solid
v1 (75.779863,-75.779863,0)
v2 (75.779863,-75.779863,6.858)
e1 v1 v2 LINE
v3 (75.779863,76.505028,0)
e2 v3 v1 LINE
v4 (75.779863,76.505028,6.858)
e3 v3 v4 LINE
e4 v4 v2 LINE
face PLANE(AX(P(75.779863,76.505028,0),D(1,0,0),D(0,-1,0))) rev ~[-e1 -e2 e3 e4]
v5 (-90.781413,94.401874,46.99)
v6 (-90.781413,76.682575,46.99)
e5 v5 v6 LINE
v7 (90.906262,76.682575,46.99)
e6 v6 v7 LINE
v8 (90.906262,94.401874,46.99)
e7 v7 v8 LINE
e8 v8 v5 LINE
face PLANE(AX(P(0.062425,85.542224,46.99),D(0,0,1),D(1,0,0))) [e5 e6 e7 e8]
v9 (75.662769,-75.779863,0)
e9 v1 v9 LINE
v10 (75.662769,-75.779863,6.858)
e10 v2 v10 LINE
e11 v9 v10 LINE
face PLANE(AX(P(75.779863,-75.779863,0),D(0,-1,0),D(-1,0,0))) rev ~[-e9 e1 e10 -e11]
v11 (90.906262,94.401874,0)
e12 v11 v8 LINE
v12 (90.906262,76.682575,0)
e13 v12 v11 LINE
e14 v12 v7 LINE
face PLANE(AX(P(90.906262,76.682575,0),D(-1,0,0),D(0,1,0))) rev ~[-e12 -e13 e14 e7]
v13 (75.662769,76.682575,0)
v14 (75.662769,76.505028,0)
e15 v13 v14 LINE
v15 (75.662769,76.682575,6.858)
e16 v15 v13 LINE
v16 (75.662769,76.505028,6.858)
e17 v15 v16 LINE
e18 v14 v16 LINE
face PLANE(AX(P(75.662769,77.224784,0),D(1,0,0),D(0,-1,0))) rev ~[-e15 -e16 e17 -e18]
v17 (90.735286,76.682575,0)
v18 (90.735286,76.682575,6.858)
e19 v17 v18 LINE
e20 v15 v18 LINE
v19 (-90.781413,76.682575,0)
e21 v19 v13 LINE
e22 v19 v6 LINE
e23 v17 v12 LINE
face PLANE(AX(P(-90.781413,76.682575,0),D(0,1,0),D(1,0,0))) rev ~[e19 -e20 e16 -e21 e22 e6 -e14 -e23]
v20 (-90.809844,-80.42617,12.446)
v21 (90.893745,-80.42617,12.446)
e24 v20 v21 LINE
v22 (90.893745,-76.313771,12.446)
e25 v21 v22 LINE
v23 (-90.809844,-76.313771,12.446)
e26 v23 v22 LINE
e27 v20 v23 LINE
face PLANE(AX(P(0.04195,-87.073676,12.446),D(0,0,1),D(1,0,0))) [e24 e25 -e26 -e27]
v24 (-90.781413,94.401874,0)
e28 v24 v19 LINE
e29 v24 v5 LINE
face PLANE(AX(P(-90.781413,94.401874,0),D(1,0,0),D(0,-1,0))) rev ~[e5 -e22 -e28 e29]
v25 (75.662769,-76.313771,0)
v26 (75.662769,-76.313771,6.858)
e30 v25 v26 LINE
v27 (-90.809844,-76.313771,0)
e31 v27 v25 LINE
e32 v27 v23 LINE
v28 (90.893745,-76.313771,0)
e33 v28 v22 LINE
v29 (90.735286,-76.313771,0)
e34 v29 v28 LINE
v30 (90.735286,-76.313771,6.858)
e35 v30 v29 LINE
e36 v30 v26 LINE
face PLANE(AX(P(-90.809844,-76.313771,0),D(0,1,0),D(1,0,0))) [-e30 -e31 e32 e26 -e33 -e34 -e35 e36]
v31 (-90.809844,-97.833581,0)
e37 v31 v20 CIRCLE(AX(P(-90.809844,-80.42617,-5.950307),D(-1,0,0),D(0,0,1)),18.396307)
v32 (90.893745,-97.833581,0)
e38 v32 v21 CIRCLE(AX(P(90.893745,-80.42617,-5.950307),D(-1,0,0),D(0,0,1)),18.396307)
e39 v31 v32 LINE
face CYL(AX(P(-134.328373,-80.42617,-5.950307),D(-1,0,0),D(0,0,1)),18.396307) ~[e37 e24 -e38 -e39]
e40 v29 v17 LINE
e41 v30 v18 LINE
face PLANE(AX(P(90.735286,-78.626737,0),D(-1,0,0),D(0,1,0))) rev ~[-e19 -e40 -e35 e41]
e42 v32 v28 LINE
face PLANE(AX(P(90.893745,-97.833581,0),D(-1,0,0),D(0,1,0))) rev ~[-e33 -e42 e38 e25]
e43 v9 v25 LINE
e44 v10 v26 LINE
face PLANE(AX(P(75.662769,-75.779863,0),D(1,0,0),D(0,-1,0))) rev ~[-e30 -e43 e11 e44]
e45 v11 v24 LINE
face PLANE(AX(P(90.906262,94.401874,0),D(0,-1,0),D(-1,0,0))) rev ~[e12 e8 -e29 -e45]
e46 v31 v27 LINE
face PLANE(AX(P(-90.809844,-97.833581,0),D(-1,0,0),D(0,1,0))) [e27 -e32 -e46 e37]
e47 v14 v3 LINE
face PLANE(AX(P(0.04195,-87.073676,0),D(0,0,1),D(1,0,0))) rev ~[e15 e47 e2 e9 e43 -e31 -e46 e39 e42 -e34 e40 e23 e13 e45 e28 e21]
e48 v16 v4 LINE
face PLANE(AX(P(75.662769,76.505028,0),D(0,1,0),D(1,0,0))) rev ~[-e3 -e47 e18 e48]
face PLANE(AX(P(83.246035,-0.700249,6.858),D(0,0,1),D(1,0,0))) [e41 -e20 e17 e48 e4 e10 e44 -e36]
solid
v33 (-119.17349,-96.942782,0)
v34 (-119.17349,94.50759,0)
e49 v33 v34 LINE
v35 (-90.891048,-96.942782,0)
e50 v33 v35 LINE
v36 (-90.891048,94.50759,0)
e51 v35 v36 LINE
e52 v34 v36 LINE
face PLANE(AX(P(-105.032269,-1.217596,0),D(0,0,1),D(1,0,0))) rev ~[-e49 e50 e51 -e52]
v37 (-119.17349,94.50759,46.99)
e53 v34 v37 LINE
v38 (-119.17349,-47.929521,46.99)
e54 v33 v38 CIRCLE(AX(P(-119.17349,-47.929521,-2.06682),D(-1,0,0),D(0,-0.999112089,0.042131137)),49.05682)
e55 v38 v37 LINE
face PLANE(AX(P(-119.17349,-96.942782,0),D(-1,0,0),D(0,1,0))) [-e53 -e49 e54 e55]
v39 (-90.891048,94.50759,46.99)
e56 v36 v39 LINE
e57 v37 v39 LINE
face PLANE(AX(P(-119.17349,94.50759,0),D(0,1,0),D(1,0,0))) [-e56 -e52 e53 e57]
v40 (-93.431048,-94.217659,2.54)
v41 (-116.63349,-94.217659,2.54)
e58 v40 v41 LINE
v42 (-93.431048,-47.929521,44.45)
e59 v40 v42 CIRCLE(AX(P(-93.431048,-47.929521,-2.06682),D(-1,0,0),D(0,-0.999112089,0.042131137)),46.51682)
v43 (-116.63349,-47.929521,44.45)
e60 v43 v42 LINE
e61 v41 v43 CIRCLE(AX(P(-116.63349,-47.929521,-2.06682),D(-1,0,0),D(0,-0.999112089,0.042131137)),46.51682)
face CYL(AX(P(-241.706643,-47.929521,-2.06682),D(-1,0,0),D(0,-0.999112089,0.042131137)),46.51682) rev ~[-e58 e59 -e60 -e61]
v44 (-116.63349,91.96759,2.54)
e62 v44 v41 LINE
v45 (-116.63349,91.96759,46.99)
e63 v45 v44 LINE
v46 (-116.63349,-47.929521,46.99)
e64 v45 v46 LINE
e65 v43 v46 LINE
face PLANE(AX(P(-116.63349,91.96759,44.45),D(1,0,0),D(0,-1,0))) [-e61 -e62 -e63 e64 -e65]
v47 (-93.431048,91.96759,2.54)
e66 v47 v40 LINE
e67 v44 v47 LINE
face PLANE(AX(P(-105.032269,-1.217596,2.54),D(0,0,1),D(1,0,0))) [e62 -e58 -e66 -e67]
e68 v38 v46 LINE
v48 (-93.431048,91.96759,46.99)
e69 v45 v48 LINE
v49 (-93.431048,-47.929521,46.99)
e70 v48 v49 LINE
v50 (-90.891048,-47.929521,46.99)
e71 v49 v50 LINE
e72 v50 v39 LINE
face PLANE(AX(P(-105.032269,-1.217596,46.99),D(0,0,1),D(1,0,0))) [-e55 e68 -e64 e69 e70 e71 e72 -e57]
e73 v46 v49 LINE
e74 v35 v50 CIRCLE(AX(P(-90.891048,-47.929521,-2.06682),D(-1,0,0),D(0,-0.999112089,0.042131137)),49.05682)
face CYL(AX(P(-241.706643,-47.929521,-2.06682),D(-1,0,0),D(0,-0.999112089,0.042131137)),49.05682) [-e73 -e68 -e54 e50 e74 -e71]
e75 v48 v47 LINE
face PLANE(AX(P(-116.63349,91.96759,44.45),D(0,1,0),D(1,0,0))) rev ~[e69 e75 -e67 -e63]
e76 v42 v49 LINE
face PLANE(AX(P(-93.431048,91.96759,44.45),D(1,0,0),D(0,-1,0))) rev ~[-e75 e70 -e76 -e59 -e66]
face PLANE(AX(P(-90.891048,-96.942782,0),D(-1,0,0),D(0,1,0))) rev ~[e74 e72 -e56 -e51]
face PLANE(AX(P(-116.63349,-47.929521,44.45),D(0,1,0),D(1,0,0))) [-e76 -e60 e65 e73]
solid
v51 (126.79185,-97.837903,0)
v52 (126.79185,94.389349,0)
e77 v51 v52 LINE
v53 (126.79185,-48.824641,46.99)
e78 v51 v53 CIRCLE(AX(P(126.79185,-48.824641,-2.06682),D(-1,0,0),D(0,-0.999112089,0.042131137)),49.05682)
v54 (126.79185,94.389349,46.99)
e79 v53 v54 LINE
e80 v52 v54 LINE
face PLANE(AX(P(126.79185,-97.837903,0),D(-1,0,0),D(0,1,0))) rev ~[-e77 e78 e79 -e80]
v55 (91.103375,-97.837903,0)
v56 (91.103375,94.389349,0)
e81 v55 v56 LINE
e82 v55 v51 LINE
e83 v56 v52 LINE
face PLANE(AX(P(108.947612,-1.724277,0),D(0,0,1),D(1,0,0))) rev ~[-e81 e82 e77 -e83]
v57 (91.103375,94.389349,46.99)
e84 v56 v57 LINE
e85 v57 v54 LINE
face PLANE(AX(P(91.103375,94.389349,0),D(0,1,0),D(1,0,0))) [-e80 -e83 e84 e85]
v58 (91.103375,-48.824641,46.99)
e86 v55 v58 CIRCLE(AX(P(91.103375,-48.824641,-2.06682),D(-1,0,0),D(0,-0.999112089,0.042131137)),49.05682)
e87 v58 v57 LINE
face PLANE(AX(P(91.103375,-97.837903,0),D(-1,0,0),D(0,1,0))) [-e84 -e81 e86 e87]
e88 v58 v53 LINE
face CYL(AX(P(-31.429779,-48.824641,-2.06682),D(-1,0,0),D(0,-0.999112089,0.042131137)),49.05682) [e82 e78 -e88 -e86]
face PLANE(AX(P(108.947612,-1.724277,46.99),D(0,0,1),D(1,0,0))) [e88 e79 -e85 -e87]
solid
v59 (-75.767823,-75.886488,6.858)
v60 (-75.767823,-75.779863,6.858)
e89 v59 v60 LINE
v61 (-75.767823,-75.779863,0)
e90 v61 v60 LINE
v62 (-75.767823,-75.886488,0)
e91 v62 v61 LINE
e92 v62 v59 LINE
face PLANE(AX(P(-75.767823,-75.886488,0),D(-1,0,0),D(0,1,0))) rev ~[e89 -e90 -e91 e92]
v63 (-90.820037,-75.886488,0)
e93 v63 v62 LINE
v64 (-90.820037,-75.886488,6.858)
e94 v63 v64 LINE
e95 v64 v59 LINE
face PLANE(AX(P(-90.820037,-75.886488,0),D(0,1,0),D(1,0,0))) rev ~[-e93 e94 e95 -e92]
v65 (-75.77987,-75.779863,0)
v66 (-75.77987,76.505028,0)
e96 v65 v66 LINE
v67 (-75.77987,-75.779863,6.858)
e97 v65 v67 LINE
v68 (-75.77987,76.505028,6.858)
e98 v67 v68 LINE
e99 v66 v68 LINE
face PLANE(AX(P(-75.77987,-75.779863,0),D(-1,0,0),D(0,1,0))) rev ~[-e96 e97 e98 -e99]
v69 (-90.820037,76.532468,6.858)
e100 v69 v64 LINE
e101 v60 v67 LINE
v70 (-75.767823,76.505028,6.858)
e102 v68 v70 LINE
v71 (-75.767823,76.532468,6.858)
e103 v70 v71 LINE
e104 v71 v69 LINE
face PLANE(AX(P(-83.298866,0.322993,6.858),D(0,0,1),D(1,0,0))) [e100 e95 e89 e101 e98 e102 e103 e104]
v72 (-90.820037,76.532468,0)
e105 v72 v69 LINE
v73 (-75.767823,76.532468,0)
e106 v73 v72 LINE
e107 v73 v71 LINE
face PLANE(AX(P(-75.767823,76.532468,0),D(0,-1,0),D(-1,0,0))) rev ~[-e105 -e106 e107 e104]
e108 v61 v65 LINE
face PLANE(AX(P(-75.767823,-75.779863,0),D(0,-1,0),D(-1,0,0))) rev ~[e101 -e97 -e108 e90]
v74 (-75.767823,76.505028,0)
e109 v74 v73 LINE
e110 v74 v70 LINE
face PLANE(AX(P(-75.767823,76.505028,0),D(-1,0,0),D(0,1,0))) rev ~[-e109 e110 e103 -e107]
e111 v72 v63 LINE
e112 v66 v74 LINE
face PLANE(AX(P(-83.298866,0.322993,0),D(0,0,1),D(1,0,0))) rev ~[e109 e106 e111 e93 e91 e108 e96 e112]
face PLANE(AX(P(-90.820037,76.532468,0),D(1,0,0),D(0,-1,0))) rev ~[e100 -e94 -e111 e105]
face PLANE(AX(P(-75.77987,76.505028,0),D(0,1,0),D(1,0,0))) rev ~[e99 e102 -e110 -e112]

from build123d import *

# Parameters (mm, degrees)
F3_DEPTH       = 46.99
F4_DEPTH       = 6.858
F5_W           = 181.7035898566
F5_H           = 21.5198099613
F6_DEPTH       = 12.446
F7_W           = 28.2824411988
F7_H           = 191.4503723383
F8_DEPTH       = 46.99
F9_W           = 35.6884747744
F9_H           = 192.2272518277
F10_DEPTH      = 46.99
F11_T1_DEPTH   = 273.3487487987
F11_2_T1_DEPTH = 280.7547823743
F12_T1_DEPTH   = 268.7406461084
F13_T          = -2.54


# Not quite as in the source:
# - a fillet or chamfer that OpenCascade refuses, or shapes differently, is made with other operations: its cross-section is extruded or revolved along the edge and cut away or added
# - a shell that OpenCascade refuses in one call is made with other operations: the cavity is built on its own and cut out


with BuildPart() as f3:
    # F2 (on face) → F3 (new body)
    with BuildSketch(Plane.XY):
        Polygon((-90.7814130187, 94.4018736482), (-90.7814130187, 76.682575047), (-76.9056975842, 76.682575047), (77.2037953138, 76.682575047), (90.9062623978, 76.682575047), (90.9062623978, 94.4018736482), align=None)
    extrude(amount=F3_DEPTH)

    # F1 (on face) → F4, piece 2 (join)
    with BuildSketch(Plane.XY):
        Polygon((75.6627693772, 77.2247835994), (75.6627693772, 76.5050277114), (75.7798627019, 76.5050277114), (75.7798627019, -75.7798627019), (75.6627693772, -75.7798627019), (75.6627693772, -78.6267369986), (90.7352864742, -78.6267369986), (90.7352864742, 77.2247835994), align=None)
    extrude(amount=F4_DEPTH)

    # F5 (on face) → F6 (join)
    with BuildSketch(Plane.XY):
        with Locations((0.0419504941, -87.0736762881)):
            Rectangle(F5_W, F5_H)
    extrude(amount=F6_DEPTH)

    # F12: fillet of radius 18.3963073453 on 1 edges, made by hand

    # F12_s2 → F12_t1 (cut)
    with BuildSketch(Plane.YZ.offset(-134.3283725601)):
        with BuildLine():
            ThreePointArc((-80.4261700184, 12.446), (-91.1257130278, 9.0144480263), (-97.8335812688, 0))
            Line((-97.8335812688, 0), (-97.8335812688, 12.446))
            Line((-97.8335812688, 12.446), (-80.4261700184, 12.446))
        make_face()
    extrude(amount=F12_T1_DEPTH, mode=Mode.SUBTRACT)


with BuildPart() as f4:
    # F1 (on face) → F4 (new body)
    with BuildSketch(Plane.XY):
        Polygon((-75.7678225636, 76.5050277114), (-75.7678225636, 76.5324681997), (-90.8200368285, 76.5324681997), (-90.8200368285, -75.8864879608), (-75.7678225636, -75.8864879608), (-75.7678225636, -75.7798627019), (-75.7798701525, -75.7798627019), (-75.7798701525, 76.5050277114), align=None)
    extrude(amount=F4_DEPTH)


with BuildPart() as f8:
    # F7 (on face) → F8 (new body)
    with BuildSketch(Plane.XY):
        with Locations((-105.0322689116, -1.2175962329)):
            Rectangle(F7_W, F7_H)
    extrude(amount=F8_DEPTH)

    # F11: fillet of radius 49.0568195874 on 1 edges, made by hand

    # F11_s2 → F11_t1 (cut)
    with BuildSketch(Plane.YZ.offset(-241.706643311)):
        with BuildLine():
            ThreePointArc((-96.942782402, 0), (-81.8793364369, 33.3447826331), (-47.9295208821, 46.99))
            Line((-47.9295208821, 46.99), (-96.942782402, 46.99))
            Line((-96.942782402, 46.99), (-96.942782402, 0))
        make_face()
    extrude(amount=F11_T1_DEPTH, mode=Mode.SUBTRACT)

    # F13: a shell. OpenCascade refuses it in one call, so the cavity is built on its own and cut out:
    # the body offset inwards by the wall thickness, plus a prism from it out through each open face.
    f13_core = offset(f8.part, amount=F13_T, mode=Mode.PRIVATE)
    f13_exits = [f13_core.faces().sort_by_distance(p)[0] for p in [
        (-105.032269, 22.019035, 44.45),
    ]]
    add(f13_core, mode=Mode.SUBTRACT)
    extrude(f13_exits, amount=-F13_T, mode=Mode.SUBTRACT)


with BuildPart() as f10:
    # F9 (on face) → F10 (new body)
    with BuildSketch(Plane.XY):
        with Locations((108.9476123452, -1.7242766917)):
            Rectangle(F9_W, F9_H)
    extrude(amount=F10_DEPTH)

    # F11#2: fillet of radius 49.0568195874 on 1 edges, made by hand

    # F11_2_s2 → F11_2_t1 (cut)
    with BuildSketch(Plane.YZ.offset(-31.4297788419)):
        with BuildLine():
            ThreePointArc((-97.8379026055, 0), (-82.7744566404, 33.3447826331), (-48.8246410856, 46.99))
            Line((-48.8246410856, 46.99), (-97.8379026055, 46.99))
            Line((-97.8379026055, 46.99), (-97.8379026055, 0))
        make_face()
    extrude(amount=F11_2_T1_DEPTH, mode=Mode.SUBTRACT)


solid = Compound([f3.part, f4.part, f8.part, f10.part])
